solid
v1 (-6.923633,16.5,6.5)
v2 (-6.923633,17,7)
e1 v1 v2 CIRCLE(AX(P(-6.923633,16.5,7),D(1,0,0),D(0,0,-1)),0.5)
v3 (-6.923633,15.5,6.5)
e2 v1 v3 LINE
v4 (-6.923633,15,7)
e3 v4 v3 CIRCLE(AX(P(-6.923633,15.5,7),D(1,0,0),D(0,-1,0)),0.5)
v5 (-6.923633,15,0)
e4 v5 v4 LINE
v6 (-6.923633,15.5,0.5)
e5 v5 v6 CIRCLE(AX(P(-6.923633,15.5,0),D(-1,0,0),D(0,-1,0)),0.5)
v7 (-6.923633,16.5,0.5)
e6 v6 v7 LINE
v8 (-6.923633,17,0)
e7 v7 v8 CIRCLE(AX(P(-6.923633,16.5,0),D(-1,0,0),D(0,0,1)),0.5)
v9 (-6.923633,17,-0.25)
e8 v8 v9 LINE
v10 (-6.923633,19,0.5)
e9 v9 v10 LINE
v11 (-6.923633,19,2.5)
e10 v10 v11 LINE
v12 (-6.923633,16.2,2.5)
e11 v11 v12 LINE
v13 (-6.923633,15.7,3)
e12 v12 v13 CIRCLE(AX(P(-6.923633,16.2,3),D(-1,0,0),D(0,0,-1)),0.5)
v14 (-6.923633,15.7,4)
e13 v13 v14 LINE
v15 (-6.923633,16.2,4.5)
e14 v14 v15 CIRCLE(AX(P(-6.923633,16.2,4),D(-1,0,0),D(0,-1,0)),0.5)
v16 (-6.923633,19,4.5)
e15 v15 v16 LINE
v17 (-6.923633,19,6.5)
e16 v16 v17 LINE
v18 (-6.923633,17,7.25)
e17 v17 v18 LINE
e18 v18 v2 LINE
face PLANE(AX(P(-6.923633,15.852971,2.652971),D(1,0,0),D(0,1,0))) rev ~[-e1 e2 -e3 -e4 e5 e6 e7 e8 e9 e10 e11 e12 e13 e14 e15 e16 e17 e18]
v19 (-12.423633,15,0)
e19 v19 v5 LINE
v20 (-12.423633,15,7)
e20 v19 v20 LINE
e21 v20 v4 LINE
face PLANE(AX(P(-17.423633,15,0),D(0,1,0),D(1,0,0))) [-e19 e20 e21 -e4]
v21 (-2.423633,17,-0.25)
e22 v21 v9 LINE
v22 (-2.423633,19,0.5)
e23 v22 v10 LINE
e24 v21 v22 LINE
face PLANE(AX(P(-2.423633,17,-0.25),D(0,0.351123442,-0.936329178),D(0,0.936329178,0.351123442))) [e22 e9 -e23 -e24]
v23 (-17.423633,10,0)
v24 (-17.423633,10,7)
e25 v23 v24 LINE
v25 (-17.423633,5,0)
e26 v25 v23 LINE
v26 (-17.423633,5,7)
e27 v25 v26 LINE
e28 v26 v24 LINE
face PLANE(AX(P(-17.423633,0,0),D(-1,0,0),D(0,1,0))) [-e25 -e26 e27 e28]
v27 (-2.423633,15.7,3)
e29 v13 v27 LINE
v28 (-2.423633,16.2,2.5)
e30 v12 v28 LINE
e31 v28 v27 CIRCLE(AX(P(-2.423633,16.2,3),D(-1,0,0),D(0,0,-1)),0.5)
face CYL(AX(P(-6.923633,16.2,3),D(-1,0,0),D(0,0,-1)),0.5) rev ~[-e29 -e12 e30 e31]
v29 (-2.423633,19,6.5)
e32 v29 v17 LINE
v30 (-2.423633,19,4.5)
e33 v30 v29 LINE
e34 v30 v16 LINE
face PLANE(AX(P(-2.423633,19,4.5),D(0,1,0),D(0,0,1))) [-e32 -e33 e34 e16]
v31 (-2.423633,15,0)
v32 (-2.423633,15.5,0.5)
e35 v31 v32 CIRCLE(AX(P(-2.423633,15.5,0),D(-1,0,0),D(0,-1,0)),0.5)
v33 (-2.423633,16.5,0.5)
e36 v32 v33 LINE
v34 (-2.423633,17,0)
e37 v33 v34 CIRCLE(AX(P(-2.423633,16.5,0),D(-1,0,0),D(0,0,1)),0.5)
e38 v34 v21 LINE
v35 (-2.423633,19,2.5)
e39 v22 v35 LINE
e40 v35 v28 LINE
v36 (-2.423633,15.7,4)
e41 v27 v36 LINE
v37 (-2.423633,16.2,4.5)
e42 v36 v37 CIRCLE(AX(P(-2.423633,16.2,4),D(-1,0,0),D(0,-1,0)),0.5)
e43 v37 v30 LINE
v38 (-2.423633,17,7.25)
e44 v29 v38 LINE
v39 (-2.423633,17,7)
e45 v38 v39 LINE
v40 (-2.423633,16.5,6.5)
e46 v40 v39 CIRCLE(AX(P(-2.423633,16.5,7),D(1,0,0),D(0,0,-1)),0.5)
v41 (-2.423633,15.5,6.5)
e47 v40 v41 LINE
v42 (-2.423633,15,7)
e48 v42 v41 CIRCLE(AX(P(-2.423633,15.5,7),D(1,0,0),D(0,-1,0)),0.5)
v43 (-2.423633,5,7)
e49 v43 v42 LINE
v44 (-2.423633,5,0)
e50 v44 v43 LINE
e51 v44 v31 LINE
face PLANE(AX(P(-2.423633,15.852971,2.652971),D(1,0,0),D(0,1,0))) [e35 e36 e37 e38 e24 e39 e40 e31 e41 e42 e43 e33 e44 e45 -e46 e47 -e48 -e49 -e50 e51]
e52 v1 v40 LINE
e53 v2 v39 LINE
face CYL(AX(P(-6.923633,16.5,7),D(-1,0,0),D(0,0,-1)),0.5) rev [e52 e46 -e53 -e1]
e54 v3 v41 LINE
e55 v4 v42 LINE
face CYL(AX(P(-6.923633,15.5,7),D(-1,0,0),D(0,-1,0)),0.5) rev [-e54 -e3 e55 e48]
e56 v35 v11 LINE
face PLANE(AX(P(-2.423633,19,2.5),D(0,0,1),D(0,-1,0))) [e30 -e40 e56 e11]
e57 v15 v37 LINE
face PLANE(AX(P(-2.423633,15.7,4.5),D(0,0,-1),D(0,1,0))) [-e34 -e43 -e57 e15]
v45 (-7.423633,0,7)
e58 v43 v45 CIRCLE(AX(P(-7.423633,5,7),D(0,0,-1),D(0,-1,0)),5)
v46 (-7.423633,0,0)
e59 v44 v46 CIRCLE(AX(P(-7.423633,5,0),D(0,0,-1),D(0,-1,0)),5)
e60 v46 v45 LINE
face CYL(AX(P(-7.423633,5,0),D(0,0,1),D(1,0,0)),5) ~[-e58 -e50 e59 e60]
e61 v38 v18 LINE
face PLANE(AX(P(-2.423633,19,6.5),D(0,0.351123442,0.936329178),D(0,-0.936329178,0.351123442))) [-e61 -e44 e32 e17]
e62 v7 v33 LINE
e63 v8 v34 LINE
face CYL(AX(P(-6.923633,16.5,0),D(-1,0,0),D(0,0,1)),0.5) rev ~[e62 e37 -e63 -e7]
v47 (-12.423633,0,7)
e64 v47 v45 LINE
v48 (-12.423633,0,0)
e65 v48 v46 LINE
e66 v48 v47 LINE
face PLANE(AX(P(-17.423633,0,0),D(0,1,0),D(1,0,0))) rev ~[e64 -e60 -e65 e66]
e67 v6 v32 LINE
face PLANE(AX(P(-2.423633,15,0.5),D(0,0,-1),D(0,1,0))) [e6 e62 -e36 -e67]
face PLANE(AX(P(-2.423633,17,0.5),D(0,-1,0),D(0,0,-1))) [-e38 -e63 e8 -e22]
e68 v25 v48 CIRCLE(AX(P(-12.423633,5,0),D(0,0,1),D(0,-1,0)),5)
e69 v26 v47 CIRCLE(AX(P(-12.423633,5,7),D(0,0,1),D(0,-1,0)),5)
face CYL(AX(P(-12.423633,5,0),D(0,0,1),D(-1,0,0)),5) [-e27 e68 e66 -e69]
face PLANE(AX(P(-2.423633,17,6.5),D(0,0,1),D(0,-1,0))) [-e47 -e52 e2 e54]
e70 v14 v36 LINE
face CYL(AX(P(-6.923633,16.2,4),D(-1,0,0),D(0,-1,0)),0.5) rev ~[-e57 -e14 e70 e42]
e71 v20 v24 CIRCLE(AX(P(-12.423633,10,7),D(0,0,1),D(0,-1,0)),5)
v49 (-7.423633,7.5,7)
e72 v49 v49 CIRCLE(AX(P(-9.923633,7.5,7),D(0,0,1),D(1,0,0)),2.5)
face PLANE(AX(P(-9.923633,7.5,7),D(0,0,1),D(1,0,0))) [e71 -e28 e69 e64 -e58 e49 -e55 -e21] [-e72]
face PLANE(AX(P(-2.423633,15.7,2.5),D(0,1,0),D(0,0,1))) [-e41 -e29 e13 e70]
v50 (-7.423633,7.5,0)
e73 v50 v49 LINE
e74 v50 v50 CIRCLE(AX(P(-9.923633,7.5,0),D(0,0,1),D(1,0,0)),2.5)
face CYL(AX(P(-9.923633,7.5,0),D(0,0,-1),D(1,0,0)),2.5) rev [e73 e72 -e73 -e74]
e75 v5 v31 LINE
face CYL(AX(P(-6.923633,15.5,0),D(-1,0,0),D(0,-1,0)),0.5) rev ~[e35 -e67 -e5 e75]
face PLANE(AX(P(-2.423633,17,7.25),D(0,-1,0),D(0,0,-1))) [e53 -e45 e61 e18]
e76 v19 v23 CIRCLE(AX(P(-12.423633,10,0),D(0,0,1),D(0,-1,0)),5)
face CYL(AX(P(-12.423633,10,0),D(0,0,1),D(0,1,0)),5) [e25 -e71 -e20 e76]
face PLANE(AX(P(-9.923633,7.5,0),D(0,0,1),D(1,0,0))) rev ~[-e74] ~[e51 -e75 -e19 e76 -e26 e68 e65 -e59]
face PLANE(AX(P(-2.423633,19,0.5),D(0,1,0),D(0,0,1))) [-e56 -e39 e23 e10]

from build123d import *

# Parameters (mm, degrees)
F0_W        = 15
F0_H        = 15
F0_R        = 2.5
F1_DEPTH    = 7
F2_W        = 0.7
F2_H        = 2
F3_DEPTH    = 4.5
F4_T1_DEPTH = 4.5
F5_R        = 5


# Not quite as in the source:
# - a fillet or chamfer that OpenCascade refuses, or shapes differently, is made with other operations: its cross-section is extruded or revolved along the edge and cut away or added


with BuildPart() as f1:
    # F0 (on Top) → F1 (new body)
    with BuildSketch(Plane.XY):
        with Locations((-9.923633188, 7.5)):
            Rectangle(F0_W, F0_H)
        with Locations((-9.923633188, 7.5)):
            Circle(F0_R, mode=Mode.SUBTRACT)
    extrude(amount=F1_DEPTH)

    # F2 (on face) → F3 (join)
    with BuildSketch(Plane.YZ.offset(-2.423633188)):
        Polygon((17, 7.25), (17, 6.5), (19, 6.5), align=None)
        Polygon((17, 6.5), (15, 6.5), (15, 4.5), (15.7, 4.5), (19, 4.5), (19, 6.5), align=None)
        with Locations((15.35, 3.5)):
            Rectangle(F2_W, F2_H)
        Polygon((15.7, 2.5), (15, 2.5), (15, 0.5), (17, 0.5), (19, 0.5), (19, 2.5), align=None)
        Polygon((19, 0.5), (17, 0.5), (17, -0.25), align=None)
    extrude(amount=-F3_DEPTH)

    # F4: fillet of radius 0.5 on 7 edges, made by hand

    # F4_s2 → F4_t1 (join)
    with BuildSketch(Plane.YZ.offset(-6.923633188)):
        with BuildLine():
            ThreePointArc((16.2, 2.5), (15.8464466094, 2.6464466094), (15.7, 3))
            Line((15.7, 3), (15.7, 2.5))
            Line((15.7, 2.5), (16.2, 2.5))
        make_face()
        with BuildLine():
            ThreePointArc((15.7, 4), (15.8464466094, 4.3535533906), (16.2, 4.5))
            Line((16.2, 4.5), (15.7, 4.5))
            Line((15.7, 4.5), (15.7, 4))
        make_face()
        with BuildLine():
            ThreePointArc((16.5, 0.5), (16.8535533906, 0.3535533906), (17, 0))
            Line((17, 0), (17, 0.5))
            Line((17, 0.5), (16.5, 0.5))
        make_face()
        with BuildLine():
            ThreePointArc((16.5, 6.5), (16.8535533906, 6.6464466094), (17, 7))
            Line((17, 7), (17, 6.5))
            Line((17, 6.5), (16.5, 6.5))
        make_face()
        with BuildLine():
            ThreePointArc((15, 7), (15.1464466094, 6.6464466094), (15.5, 6.5))
            Line((15.5, 6.5), (15, 6.5))
            Line((15, 6.5), (15, 7))
        make_face()
        with BuildLine():
            ThreePointArc((15, 0), (15.1464466094, 0.3535533906), (15.5, 0.5))
            Line((15.5, 0.5), (15, 0.5))
            Line((15, 0.5), (15, 0))
        make_face()
    extrude(amount=F4_T1_DEPTH)

    # F5
    f5_edges = [f1.edges().sort_by_distance(p)[0] for p in [
        (-17.423633, 15, 3.5),
        (-17.423633, 0, 3.5),
        (-2.423633, 0, 3.5),
    ]]
    fillet(f5_edges, radius=F5_R)


solid = f1.part
